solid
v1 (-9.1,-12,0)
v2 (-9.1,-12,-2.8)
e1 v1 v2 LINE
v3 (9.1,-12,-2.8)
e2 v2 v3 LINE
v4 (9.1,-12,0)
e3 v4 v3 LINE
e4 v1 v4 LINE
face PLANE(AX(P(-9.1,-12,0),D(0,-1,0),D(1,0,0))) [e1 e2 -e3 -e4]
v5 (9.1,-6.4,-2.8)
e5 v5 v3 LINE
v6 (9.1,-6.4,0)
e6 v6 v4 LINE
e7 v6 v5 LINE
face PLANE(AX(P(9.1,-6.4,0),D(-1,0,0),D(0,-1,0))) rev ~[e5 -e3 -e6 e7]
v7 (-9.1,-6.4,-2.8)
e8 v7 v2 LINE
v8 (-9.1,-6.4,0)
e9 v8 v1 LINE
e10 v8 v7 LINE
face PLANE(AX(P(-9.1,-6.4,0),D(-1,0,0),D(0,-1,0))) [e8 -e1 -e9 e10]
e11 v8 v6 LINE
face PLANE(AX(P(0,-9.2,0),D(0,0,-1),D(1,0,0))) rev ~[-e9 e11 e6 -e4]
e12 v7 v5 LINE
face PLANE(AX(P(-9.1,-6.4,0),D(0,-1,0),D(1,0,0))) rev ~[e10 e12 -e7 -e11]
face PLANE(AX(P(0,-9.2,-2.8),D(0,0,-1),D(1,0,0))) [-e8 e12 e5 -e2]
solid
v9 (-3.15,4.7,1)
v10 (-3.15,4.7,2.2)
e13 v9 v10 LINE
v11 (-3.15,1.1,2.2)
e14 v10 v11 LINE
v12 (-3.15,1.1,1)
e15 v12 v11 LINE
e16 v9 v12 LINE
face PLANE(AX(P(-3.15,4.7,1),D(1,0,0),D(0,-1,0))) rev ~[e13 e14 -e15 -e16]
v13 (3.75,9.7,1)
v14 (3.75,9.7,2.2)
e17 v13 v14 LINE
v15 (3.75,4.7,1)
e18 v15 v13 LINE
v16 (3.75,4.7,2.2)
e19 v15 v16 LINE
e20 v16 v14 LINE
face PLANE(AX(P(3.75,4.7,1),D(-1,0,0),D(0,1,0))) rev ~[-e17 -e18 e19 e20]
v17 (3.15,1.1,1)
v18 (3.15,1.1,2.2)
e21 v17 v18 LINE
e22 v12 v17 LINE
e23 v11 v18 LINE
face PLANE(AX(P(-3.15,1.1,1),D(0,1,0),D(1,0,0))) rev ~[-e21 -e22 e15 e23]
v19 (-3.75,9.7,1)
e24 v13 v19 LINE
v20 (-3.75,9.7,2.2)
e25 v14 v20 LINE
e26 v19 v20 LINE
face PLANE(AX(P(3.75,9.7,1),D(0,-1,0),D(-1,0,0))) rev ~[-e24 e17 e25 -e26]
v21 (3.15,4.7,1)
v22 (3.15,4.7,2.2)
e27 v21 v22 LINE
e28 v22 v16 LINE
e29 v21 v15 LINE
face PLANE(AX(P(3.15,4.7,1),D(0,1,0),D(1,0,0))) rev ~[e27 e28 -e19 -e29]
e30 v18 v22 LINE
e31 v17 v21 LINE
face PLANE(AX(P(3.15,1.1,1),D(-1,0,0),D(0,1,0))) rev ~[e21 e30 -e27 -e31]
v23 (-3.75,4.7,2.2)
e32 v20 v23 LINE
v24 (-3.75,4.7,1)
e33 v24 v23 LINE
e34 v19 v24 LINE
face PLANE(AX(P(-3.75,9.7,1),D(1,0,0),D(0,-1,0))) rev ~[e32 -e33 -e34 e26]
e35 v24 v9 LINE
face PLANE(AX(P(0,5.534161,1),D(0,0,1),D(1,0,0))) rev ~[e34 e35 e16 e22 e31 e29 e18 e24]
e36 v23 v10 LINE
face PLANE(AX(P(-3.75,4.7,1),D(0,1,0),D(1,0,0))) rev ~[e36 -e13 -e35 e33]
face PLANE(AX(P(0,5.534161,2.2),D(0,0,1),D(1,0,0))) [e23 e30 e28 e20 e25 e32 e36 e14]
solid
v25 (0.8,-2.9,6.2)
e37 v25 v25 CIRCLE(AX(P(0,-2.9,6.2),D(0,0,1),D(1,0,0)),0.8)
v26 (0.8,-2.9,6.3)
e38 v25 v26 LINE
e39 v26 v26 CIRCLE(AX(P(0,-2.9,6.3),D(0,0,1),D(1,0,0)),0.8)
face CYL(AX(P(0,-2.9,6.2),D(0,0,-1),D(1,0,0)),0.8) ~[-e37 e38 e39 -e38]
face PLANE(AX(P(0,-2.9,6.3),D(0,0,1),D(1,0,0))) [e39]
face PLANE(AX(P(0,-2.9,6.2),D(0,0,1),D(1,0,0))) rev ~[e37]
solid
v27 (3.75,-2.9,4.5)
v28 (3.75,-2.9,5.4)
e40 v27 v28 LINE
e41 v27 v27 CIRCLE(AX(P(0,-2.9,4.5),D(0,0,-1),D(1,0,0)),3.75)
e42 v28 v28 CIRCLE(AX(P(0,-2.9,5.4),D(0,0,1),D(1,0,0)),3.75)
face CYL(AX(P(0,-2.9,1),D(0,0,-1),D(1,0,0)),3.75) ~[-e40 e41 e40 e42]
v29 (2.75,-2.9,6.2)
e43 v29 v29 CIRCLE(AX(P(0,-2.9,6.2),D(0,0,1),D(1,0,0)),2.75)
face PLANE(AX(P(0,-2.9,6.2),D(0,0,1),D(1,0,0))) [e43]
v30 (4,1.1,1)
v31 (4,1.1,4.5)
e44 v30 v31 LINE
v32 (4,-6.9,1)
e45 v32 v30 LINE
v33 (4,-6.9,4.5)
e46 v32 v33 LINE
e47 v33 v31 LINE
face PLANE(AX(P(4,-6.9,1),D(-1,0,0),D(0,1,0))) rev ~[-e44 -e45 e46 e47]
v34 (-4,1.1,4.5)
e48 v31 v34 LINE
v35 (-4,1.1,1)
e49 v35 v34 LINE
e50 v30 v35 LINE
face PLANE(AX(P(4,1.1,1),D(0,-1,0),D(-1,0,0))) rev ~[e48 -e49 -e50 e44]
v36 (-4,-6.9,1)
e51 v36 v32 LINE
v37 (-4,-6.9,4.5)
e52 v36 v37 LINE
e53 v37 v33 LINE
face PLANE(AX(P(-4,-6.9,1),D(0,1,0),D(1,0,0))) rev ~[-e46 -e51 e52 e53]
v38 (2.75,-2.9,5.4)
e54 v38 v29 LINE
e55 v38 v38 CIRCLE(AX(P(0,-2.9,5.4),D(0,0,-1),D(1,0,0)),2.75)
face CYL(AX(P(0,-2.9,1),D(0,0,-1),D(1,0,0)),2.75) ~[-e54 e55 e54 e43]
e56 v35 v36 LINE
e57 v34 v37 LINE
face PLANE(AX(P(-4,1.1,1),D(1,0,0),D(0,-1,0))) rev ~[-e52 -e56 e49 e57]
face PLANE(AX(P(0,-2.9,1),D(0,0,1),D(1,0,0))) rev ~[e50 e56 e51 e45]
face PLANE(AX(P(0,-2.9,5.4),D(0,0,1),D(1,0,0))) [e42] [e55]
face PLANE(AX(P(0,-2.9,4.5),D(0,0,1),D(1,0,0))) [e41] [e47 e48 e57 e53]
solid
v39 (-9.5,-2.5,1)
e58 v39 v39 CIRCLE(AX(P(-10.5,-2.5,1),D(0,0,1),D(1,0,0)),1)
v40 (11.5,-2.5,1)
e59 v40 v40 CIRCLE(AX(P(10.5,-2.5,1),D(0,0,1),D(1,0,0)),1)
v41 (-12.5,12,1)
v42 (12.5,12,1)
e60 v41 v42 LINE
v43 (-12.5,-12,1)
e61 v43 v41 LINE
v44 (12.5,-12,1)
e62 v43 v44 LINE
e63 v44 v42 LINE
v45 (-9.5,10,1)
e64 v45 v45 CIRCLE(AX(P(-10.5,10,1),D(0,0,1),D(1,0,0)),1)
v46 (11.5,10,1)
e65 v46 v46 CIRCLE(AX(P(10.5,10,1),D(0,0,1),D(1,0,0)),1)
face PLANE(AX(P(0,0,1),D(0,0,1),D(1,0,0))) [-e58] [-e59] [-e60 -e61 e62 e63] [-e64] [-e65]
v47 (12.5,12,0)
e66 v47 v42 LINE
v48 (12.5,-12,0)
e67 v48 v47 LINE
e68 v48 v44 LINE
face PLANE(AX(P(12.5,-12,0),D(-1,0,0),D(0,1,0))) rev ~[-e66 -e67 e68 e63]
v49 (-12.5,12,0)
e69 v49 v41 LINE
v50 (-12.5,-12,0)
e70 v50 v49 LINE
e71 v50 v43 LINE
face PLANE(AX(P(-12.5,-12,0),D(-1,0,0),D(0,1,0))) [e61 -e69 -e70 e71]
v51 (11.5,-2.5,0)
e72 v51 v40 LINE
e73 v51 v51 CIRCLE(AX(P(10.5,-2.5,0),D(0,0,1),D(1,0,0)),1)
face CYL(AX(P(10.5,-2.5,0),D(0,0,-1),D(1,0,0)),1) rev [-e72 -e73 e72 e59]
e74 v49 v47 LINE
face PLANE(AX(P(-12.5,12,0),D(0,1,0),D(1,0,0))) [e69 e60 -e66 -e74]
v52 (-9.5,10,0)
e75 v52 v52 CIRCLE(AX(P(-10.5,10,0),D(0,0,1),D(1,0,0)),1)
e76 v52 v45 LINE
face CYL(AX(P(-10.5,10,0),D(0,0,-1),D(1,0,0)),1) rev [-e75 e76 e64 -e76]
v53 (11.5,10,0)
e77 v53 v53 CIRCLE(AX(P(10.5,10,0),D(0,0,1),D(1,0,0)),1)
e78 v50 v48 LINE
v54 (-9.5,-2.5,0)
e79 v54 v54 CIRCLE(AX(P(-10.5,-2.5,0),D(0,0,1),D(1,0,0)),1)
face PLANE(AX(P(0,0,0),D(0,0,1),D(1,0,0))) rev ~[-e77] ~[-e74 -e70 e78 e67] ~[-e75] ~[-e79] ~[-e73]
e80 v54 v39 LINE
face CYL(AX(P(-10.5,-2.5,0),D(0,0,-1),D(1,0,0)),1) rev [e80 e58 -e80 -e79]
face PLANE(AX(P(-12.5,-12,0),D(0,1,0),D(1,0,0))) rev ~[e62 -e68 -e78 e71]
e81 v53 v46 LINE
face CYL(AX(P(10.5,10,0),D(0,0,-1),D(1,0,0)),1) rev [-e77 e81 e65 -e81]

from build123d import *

# Parameters (mm, degrees)
F0_W      = 25
F0_H      = 24
F0_R      = 1
F1_DEPTH  = 1
F2_R      = 3.75
F2_R_2    = 2.75
F3_DEPTH  = 3.5
F4_DEPTH  = 4.4
F5_DEPTH  = 5.2
F6_R      = 0.8
F7_DEPTH  = 0.1
F8_W      = 18.2
F8_H      = 5.6
F9_DEPTH  = 2.8
F11_DEPTH = 1.2


with BuildPart() as f1:
    # F0 (on Top) → F1 (new body)
    with BuildSketch(Plane.XY):
        Rectangle(F0_W, F0_H)
        with Locations((-10.5, -2.5)):
            Circle(F0_R, mode=Mode.SUBTRACT)
        with Locations((10.5, -2.5)):
            Circle(F0_R, mode=Mode.SUBTRACT)
        with Locations((-10.5, 10)):
            Circle(F0_R, mode=Mode.SUBTRACT)
        with Locations((10.5, 10)):
            Circle(F0_R, mode=Mode.SUBTRACT)
    extrude(amount=F1_DEPTH)


with BuildPart() as f3:
    # F2 (on face) → F3 (new body)
    with BuildSketch(Plane.XY.offset(1)):
        Polygon((4, -6.9), (4, 1.1), (3.4, 1.1), (-3.4, 1.1), (-4, 1.1), (-4, -6.9), align=None)
        with Locations((0, -2.9)):
            Circle(F2_R, mode=Mode.SUBTRACT)
        with Locations((0, -2.9)):
            Circle(F2_R)
        with Locations((0, -2.9)):
            Circle(F2_R_2, mode=Mode.SUBTRACT)
        with Locations((0, -2.9)):
            Circle(F2_R_2)
    extrude(amount=F3_DEPTH)

    # F2 (on face) → F4 (join)
    with BuildSketch(Plane.XY.offset(1)):
        with Locations((0, -2.9)):
            Circle(F2_R)
        with Locations((0, -2.9)):
            Circle(F2_R_2, mode=Mode.SUBTRACT)
        with Locations((0, -2.9)):
            Circle(F2_R_2)
    extrude(amount=F4_DEPTH)

    # F2 (on face) → F5 (join)
    with BuildSketch(Plane.XY.offset(1)):
        with Locations((0, -2.9)):
            Circle(F2_R_2)
    extrude(amount=F5_DEPTH)


with BuildPart() as f7:
    # F6 (on face) → F7 (new body)
    with BuildSketch(Plane.XY.offset(6.2)):
        with Locations((0, -2.9)):
            Circle(F6_R)
    extrude(amount=F7_DEPTH)


with BuildPart() as f9:
    # F8 (on face) → F9 (new body)
    with BuildSketch(Plane(origin=(0, 0, 0), x_dir=(1, 0, 0), z_dir=(0, 0, -1))):
        with Locations((0, 9.2)):
            Rectangle(F8_W, F8_H)
    extrude(amount=F9_DEPTH)


with BuildPart() as f11:
    # F10 (on face) → F11 (new body)
    with BuildSketch(Plane.XY.offset(1)):
        Polygon((-3.15, 4.7), (-3.15, 1.1), (3.15, 1.1), (3.15, 4.7), (3.75, 4.7), (3.75, 9.7), (-3.75, 9.7), (-3.75, 4.7), align=None)
    extrude(amount=F11_DEPTH)


solid = Compound([f1.part, f3.part, f7.part, f9.part, f11.part])
